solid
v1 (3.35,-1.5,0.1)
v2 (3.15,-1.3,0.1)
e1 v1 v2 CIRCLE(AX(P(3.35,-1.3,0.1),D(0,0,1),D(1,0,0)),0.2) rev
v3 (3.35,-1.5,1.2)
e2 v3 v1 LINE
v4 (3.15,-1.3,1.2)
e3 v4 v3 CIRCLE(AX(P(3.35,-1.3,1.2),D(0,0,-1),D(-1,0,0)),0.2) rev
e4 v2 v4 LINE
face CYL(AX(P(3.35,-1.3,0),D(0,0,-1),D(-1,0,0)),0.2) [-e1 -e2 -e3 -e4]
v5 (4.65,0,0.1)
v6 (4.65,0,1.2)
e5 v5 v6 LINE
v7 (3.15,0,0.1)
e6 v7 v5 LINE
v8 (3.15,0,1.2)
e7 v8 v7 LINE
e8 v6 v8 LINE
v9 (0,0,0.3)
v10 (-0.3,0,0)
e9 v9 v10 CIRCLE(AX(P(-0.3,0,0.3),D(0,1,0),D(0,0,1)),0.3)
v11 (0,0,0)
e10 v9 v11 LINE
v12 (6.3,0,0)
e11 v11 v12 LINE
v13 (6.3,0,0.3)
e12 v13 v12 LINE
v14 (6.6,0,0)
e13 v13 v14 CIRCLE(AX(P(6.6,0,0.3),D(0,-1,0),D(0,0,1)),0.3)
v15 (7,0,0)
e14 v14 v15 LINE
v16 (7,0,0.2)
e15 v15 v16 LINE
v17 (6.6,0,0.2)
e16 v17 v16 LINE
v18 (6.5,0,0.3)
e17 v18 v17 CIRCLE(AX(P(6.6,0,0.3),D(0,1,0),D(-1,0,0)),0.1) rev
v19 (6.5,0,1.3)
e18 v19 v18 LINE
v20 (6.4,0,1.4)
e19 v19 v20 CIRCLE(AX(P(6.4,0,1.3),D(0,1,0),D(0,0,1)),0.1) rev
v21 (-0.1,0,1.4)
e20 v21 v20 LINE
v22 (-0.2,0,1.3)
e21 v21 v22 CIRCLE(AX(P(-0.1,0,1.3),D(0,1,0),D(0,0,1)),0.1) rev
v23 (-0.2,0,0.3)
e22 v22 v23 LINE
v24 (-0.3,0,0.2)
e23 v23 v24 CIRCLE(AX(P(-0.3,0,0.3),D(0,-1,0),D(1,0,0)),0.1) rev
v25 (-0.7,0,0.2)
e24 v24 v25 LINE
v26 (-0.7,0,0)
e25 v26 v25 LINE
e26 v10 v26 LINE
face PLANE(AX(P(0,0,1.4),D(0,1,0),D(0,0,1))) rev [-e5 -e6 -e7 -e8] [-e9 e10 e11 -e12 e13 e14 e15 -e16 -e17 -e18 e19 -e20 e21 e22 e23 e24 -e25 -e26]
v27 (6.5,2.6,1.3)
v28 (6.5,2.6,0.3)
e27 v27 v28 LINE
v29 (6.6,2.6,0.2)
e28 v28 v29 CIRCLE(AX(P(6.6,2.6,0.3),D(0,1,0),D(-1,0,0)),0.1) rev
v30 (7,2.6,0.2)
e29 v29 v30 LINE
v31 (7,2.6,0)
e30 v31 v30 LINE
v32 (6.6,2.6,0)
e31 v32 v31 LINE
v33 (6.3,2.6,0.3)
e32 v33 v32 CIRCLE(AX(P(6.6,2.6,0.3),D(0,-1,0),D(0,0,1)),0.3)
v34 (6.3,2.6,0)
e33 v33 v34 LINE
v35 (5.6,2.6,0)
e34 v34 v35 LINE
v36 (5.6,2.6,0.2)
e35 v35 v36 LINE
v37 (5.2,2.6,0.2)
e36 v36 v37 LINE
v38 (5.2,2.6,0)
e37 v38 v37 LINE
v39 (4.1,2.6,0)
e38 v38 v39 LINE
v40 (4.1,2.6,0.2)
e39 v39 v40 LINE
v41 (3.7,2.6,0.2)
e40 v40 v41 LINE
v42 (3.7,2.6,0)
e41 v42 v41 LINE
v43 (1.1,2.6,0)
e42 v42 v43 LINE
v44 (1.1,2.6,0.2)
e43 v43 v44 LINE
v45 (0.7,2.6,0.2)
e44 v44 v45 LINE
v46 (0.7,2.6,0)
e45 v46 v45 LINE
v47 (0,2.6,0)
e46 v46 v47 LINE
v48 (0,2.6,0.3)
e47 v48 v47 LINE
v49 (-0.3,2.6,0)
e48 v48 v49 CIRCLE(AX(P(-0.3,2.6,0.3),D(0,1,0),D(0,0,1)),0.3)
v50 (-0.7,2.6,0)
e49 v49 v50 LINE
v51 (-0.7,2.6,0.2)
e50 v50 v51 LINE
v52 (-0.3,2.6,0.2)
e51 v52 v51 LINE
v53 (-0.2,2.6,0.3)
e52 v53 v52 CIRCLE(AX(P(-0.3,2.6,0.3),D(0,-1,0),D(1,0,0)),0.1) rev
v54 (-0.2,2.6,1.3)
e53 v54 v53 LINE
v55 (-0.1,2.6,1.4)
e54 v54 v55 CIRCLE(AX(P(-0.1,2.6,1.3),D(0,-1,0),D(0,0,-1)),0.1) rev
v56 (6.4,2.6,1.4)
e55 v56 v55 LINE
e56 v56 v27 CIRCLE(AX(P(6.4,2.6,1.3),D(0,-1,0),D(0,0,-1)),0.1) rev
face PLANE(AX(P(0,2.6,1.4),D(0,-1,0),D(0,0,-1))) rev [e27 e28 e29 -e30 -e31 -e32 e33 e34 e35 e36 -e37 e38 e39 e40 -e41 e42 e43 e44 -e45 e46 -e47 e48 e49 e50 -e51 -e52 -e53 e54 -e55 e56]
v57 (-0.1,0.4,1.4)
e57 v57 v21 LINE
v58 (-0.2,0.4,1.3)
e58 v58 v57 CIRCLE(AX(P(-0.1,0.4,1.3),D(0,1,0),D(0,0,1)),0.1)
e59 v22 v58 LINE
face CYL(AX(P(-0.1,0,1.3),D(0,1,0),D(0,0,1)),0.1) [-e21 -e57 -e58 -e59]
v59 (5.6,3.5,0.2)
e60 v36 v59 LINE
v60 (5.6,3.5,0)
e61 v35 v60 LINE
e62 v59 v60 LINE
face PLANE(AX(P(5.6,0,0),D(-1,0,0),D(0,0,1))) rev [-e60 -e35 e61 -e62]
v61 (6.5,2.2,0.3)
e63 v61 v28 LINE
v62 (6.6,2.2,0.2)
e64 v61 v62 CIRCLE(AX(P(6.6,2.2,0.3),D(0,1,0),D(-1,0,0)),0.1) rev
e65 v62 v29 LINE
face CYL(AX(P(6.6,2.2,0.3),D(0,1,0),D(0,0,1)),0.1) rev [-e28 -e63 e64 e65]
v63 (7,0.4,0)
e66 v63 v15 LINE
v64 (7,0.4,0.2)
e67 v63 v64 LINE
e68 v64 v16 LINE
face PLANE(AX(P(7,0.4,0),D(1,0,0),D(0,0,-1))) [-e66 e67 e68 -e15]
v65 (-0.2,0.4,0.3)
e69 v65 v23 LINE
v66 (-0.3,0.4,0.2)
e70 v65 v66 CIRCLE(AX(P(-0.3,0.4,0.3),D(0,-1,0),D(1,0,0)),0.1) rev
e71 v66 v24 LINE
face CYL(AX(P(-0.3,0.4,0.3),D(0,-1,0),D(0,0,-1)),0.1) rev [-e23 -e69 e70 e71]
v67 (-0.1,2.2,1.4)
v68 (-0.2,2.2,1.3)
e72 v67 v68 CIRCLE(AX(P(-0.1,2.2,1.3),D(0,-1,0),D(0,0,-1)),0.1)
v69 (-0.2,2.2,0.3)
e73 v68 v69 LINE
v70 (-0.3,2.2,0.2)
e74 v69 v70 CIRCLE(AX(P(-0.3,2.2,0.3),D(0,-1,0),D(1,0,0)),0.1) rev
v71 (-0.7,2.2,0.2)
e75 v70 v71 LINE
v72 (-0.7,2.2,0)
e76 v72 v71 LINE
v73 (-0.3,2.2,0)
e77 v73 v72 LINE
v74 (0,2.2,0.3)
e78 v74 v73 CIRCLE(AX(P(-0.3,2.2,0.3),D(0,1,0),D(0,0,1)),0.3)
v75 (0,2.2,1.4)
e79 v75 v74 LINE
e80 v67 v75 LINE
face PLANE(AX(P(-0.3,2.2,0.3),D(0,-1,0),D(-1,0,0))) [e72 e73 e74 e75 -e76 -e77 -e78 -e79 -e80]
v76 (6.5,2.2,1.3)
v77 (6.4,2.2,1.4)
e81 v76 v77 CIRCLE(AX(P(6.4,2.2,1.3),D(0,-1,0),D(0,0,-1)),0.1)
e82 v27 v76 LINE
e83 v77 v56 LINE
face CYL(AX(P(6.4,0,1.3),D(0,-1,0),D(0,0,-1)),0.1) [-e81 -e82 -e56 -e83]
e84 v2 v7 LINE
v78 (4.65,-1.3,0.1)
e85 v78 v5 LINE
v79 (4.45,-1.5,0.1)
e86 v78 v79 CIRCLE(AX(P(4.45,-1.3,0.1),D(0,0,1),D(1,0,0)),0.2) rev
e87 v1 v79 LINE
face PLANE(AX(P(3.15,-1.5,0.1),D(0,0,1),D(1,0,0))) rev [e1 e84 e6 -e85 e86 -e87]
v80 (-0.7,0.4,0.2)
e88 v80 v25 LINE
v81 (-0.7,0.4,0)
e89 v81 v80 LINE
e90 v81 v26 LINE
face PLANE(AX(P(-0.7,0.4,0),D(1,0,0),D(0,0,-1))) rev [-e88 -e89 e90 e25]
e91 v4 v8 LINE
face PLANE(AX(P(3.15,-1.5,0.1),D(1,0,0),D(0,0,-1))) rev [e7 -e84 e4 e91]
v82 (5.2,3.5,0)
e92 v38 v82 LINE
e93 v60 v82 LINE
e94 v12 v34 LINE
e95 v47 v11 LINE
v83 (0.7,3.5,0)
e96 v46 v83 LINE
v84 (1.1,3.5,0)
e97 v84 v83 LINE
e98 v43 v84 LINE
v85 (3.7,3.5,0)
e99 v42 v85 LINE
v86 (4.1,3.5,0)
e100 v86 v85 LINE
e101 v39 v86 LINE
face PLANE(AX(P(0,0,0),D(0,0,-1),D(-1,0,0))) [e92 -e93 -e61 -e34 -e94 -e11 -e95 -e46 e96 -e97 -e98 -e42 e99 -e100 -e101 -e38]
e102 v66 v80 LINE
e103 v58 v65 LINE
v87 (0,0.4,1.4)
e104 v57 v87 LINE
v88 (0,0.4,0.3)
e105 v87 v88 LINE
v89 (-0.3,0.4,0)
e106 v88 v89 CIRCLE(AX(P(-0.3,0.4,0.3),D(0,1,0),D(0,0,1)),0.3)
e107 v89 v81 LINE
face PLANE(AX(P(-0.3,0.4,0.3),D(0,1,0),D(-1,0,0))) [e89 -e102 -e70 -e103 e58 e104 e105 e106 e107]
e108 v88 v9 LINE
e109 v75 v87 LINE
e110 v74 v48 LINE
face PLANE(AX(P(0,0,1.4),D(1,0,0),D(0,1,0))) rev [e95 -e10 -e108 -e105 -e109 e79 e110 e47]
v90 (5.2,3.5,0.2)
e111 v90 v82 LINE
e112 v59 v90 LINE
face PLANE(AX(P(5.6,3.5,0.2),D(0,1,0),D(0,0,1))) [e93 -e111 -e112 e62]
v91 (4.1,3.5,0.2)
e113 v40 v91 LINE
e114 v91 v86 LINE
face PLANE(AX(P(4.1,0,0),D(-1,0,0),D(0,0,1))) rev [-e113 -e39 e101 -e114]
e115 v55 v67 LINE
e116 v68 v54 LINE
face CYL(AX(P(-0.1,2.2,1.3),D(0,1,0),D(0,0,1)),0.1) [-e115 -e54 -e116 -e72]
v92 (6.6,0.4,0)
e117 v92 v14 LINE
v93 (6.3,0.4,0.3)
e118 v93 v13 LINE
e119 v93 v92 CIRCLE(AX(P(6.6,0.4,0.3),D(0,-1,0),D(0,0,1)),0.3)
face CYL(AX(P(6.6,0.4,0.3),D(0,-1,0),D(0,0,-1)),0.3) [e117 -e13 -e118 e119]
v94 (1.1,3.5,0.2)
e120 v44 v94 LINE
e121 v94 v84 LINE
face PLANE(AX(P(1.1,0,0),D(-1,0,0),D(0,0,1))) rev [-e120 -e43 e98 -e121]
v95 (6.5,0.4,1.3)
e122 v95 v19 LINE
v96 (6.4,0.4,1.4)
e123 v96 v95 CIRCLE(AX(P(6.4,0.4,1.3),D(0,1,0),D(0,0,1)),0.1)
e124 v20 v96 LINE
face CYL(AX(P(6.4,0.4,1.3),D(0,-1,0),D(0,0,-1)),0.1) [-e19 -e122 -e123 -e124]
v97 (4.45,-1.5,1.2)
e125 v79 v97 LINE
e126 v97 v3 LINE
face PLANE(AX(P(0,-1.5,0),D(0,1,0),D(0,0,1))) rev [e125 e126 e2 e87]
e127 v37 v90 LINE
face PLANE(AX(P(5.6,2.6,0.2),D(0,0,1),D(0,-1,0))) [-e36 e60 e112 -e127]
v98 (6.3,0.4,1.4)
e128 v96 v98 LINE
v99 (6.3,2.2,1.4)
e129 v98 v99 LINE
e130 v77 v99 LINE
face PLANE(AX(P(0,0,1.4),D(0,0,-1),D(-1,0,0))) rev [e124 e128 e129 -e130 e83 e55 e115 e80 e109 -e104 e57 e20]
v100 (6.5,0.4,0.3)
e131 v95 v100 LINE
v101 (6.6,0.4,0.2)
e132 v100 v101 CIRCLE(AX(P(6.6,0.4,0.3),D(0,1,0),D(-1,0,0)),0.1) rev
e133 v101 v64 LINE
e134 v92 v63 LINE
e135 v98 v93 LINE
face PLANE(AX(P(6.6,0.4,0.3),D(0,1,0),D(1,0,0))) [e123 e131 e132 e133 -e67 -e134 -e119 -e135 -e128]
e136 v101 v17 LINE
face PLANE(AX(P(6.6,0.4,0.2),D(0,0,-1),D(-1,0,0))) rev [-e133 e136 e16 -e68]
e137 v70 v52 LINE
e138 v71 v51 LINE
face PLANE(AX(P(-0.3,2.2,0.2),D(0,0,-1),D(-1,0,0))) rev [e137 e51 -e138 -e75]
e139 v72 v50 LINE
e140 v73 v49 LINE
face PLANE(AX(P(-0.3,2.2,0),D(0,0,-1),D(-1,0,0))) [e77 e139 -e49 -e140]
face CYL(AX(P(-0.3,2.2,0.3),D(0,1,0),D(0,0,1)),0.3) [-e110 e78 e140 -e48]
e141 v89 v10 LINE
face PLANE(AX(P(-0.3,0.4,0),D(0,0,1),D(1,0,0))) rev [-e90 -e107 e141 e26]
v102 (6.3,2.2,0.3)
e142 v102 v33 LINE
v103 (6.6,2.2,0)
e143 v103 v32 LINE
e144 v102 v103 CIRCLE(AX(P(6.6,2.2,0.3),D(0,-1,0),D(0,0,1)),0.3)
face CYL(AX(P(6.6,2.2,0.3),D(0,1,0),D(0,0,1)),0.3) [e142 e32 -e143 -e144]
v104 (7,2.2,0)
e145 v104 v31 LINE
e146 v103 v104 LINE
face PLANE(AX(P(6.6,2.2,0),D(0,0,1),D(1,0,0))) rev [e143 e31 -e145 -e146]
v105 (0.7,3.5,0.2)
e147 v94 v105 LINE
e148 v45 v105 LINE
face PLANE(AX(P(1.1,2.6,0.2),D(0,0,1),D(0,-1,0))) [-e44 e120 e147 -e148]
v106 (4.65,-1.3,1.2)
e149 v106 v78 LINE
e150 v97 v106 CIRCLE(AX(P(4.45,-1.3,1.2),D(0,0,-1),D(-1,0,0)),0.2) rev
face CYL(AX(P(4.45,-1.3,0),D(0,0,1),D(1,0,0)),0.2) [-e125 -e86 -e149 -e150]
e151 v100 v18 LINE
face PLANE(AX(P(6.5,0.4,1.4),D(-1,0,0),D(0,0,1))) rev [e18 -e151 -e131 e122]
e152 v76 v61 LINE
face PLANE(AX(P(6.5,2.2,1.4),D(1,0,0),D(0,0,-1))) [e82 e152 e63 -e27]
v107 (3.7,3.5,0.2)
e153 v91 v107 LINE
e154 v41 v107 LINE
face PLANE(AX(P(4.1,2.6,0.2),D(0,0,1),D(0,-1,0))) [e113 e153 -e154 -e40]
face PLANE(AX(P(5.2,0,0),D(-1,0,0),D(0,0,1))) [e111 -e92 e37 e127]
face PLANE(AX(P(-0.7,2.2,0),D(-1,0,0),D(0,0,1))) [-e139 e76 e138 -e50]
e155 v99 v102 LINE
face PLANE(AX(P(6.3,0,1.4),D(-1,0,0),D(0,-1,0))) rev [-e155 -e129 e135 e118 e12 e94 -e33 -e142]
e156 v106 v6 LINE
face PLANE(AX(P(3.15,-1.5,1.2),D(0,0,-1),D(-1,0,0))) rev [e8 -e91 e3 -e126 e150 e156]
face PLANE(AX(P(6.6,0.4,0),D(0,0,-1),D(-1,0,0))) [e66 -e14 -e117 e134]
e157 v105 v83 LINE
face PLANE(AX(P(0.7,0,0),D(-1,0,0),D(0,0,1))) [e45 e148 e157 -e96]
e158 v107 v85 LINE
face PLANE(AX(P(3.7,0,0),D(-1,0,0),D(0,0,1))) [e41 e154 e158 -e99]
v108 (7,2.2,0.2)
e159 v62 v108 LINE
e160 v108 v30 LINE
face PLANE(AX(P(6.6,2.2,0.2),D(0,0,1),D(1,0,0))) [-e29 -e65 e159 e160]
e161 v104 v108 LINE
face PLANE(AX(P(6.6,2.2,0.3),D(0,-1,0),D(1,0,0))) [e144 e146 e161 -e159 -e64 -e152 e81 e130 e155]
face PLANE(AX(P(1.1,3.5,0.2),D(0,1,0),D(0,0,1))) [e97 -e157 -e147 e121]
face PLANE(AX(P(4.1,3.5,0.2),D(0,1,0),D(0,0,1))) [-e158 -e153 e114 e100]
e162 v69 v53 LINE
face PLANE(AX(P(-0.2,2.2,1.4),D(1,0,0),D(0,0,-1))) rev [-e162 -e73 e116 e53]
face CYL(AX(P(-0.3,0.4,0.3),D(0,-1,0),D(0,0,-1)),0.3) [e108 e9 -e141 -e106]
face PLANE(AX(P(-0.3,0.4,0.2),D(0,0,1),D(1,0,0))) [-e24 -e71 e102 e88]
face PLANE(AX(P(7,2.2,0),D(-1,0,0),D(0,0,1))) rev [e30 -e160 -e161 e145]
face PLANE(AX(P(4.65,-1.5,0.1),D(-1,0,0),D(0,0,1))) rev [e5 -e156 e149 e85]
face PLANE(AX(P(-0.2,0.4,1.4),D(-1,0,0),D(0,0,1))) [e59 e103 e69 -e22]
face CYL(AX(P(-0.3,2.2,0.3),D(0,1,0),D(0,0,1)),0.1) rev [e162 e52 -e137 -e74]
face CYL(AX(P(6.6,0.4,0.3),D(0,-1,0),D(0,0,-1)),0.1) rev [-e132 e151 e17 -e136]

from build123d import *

# Parameters (mm, degrees)
SKETCH2_W            = 6.3
SKETCH2_H            = 2.6
BOSS_EXTRUDE1_DEPTH  = 1.4
EXTRUDE_THIN2_DEPTH  = 0.4
FILLET1_R            = 0.1
FILLET1_OF_MIRROR3_R = 0.1
MIRROR4_DEPTH        = 0.4
MIRROR4_START        = 2.2
MIRROR4_2_DEPTH      = 0.4
SKETCH4_W            = 0.2
SKETCH4_H            = 0.9
EXTRUDE_THIN3_DEPTH  = 0.2
SKETCH5_W            = 0.2
SKETCH5_H            = 0.9
EXTRUDE_THIN4_DEPTH  = 0.2
SKETCH6_W            = 0.2
SKETCH6_H            = 0.9
EXTRUDE_THIN5_DEPTH  = 0.2
SKETCH8_W            = 1.5
SKETCH8_H            = 1.1
BOSS_EXTRUDE2_DEPTH  = 1.5
FILLET2_R            = 0.2


# Read off the part's stored shape, not the designer's step: Mirror4
with BuildPart() as part:
    # Sketch2 → Boss-Extrude1 (new body)
    with BuildSketch(Plane.XY):
        with Locations((3.15, 1.3)):
            Rectangle(SKETCH2_W, SKETCH2_H)
    extrude(amount=BOSS_EXTRUDE1_DEPTH)

    # Sketch3 → Extrude-Thin2 (add)
    with BuildSketch(Plane.XZ):
        with BuildLine():
            Line((0, 1.4), (0, 0.3))
            ThreePointArc((0, 0.3), (-0.087867966, 0.087867966), (-0.3, 0))
            Line((-0.3, 0), (-0.7, 0))
            Line((-0.7, 0), (-0.7, 0.2))
            Line((-0.7, 0.2), (-0.3, 0.2))
            ThreePointArc((-0.3, 0.2), (-0.229289322, 0.229289322), (-0.2, 0.3))
            Line((-0.2, 0.3), (-0.2, 1.4))
            Line((-0.2, 1.4), (0, 1.4))
        make_face()
    extrude_thin2 = extrude(amount=-EXTRUDE_THIN2_DEPTH)

    # Fillet1
    fillet1_edges = [part.edges().sort_by_distance(p)[0] for p in [
        (-0.2, 0.2, 1.4),
    ]]
    fillet(fillet1_edges, radius=FILLET1_R)

    # Mirror3: Extrude-Thin2 across plane
    add(extrude_thin2.mirror(Plane.ZX.offset(1.3)))

    # Fillet1 of Mirror3
    fillet1_of_mirror3_edges = [part.edges().sort_by_distance(p)[0] for p in [
        (-0.2, 2.4, 1.4),
    ]]
    fillet(fillet1_of_mirror3_edges, radius=FILLET1_OF_MIRROR3_R)

    # Mirror4 outline → Mirror4 (add)
    with BuildSketch(Plane(origin=(0, 0, 0), x_dir=(1, 0, 0), z_dir=(0, 1, 0))):
        with BuildLine():
            Line((7, 0), (6.6, 0))
            ThreePointArc((6.6, 0), (6.387867966, -0.087867966), (6.3, -0.3))
            Line((6.3, -0.3), (6.3, -1.4))
            Line((6.3, -1.4), (6.4, -1.4))
            ThreePointArc((6.4, -1.4), (6.470710678, -1.370710678), (6.5, -1.3))
            Line((6.5, -1.3), (6.5, -0.3))
            ThreePointArc((6.5, -0.3), (6.529289322, -0.229289322), (6.6, -0.2))
            Line((6.6, -0.2), (7, -0.2))
            Line((7, -0.2), (7, 0))
        make_face()
    extrude(amount=MIRROR4_DEPTH)

    # Mirror4 2 outline → Mirror4 2 (add)
    with BuildSketch(Plane(origin=(0, 0, 0), x_dir=(1, 0, 0), z_dir=(0, 1, 0)).offset(MIRROR4_START)):
        with BuildLine():
            Line((7, 0), (6.6, 0))
            ThreePointArc((6.6, 0), (6.387867966, -0.087867966), (6.3, -0.3))
            Line((6.3, -0.3), (6.3, -1.4))
            Line((6.3, -1.4), (6.4, -1.4))
            ThreePointArc((6.4, -1.4), (6.470710678, -1.370710678), (6.5, -1.3))
            Line((6.5, -1.3), (6.5, -0.3))
            ThreePointArc((6.5, -0.3), (6.529289322, -0.229289322), (6.6, -0.2))
            Line((6.6, -0.2), (7, -0.2))
            Line((7, -0.2), (7, 0))
        make_face()
    extrude(amount=MIRROR4_2_DEPTH)

    # Sketch4 → Extrude-Thin3 (add, symmetric)
    with BuildSketch(Plane(origin=(0.9, 0, 0), x_dir=(0, 0, -1), z_dir=(1, 0, 0))):
        with Locations((-0.1, 3.05)):
            Rectangle(SKETCH4_W, SKETCH4_H)
    extrude(amount=EXTRUDE_THIN3_DEPTH, both=True)

    # Sketch5 → Extrude-Thin4 (add, symmetric)
    with BuildSketch(Plane(origin=(3.9, 0, 0), x_dir=(0, 0, -1), z_dir=(1, 0, 0))):
        with Locations((-0.1, 3.05)):
            Rectangle(SKETCH5_W, SKETCH5_H)
    extrude(amount=EXTRUDE_THIN4_DEPTH, both=True)

    # Sketch6 → Extrude-Thin5 (add, symmetric)
    with BuildSketch(Plane(origin=(5.4, 0, 0), x_dir=(0, 0, -1), z_dir=(1, 0, 0))):
        with Locations((-0.1, 3.05)):
            Rectangle(SKETCH6_W, SKETCH6_H)
    extrude(amount=EXTRUDE_THIN5_DEPTH, both=True)

    # Sketch8 → Boss-Extrude2 (add)
    with BuildSketch(Plane.XZ):
        with Locations((3.9, 0.65)):
            Rectangle(SKETCH8_W, SKETCH8_H)
    extrude(amount=BOSS_EXTRUDE2_DEPTH)

    # Fillet2
    fillet2_edges = [part.edges().sort_by_distance(p)[0] for p in [
        (3.15, -1.5, 0.65),
        (4.65, -1.5, 0.65),
    ]]
    fillet(fillet2_edges, radius=FILLET2_R)


solid = part.part
